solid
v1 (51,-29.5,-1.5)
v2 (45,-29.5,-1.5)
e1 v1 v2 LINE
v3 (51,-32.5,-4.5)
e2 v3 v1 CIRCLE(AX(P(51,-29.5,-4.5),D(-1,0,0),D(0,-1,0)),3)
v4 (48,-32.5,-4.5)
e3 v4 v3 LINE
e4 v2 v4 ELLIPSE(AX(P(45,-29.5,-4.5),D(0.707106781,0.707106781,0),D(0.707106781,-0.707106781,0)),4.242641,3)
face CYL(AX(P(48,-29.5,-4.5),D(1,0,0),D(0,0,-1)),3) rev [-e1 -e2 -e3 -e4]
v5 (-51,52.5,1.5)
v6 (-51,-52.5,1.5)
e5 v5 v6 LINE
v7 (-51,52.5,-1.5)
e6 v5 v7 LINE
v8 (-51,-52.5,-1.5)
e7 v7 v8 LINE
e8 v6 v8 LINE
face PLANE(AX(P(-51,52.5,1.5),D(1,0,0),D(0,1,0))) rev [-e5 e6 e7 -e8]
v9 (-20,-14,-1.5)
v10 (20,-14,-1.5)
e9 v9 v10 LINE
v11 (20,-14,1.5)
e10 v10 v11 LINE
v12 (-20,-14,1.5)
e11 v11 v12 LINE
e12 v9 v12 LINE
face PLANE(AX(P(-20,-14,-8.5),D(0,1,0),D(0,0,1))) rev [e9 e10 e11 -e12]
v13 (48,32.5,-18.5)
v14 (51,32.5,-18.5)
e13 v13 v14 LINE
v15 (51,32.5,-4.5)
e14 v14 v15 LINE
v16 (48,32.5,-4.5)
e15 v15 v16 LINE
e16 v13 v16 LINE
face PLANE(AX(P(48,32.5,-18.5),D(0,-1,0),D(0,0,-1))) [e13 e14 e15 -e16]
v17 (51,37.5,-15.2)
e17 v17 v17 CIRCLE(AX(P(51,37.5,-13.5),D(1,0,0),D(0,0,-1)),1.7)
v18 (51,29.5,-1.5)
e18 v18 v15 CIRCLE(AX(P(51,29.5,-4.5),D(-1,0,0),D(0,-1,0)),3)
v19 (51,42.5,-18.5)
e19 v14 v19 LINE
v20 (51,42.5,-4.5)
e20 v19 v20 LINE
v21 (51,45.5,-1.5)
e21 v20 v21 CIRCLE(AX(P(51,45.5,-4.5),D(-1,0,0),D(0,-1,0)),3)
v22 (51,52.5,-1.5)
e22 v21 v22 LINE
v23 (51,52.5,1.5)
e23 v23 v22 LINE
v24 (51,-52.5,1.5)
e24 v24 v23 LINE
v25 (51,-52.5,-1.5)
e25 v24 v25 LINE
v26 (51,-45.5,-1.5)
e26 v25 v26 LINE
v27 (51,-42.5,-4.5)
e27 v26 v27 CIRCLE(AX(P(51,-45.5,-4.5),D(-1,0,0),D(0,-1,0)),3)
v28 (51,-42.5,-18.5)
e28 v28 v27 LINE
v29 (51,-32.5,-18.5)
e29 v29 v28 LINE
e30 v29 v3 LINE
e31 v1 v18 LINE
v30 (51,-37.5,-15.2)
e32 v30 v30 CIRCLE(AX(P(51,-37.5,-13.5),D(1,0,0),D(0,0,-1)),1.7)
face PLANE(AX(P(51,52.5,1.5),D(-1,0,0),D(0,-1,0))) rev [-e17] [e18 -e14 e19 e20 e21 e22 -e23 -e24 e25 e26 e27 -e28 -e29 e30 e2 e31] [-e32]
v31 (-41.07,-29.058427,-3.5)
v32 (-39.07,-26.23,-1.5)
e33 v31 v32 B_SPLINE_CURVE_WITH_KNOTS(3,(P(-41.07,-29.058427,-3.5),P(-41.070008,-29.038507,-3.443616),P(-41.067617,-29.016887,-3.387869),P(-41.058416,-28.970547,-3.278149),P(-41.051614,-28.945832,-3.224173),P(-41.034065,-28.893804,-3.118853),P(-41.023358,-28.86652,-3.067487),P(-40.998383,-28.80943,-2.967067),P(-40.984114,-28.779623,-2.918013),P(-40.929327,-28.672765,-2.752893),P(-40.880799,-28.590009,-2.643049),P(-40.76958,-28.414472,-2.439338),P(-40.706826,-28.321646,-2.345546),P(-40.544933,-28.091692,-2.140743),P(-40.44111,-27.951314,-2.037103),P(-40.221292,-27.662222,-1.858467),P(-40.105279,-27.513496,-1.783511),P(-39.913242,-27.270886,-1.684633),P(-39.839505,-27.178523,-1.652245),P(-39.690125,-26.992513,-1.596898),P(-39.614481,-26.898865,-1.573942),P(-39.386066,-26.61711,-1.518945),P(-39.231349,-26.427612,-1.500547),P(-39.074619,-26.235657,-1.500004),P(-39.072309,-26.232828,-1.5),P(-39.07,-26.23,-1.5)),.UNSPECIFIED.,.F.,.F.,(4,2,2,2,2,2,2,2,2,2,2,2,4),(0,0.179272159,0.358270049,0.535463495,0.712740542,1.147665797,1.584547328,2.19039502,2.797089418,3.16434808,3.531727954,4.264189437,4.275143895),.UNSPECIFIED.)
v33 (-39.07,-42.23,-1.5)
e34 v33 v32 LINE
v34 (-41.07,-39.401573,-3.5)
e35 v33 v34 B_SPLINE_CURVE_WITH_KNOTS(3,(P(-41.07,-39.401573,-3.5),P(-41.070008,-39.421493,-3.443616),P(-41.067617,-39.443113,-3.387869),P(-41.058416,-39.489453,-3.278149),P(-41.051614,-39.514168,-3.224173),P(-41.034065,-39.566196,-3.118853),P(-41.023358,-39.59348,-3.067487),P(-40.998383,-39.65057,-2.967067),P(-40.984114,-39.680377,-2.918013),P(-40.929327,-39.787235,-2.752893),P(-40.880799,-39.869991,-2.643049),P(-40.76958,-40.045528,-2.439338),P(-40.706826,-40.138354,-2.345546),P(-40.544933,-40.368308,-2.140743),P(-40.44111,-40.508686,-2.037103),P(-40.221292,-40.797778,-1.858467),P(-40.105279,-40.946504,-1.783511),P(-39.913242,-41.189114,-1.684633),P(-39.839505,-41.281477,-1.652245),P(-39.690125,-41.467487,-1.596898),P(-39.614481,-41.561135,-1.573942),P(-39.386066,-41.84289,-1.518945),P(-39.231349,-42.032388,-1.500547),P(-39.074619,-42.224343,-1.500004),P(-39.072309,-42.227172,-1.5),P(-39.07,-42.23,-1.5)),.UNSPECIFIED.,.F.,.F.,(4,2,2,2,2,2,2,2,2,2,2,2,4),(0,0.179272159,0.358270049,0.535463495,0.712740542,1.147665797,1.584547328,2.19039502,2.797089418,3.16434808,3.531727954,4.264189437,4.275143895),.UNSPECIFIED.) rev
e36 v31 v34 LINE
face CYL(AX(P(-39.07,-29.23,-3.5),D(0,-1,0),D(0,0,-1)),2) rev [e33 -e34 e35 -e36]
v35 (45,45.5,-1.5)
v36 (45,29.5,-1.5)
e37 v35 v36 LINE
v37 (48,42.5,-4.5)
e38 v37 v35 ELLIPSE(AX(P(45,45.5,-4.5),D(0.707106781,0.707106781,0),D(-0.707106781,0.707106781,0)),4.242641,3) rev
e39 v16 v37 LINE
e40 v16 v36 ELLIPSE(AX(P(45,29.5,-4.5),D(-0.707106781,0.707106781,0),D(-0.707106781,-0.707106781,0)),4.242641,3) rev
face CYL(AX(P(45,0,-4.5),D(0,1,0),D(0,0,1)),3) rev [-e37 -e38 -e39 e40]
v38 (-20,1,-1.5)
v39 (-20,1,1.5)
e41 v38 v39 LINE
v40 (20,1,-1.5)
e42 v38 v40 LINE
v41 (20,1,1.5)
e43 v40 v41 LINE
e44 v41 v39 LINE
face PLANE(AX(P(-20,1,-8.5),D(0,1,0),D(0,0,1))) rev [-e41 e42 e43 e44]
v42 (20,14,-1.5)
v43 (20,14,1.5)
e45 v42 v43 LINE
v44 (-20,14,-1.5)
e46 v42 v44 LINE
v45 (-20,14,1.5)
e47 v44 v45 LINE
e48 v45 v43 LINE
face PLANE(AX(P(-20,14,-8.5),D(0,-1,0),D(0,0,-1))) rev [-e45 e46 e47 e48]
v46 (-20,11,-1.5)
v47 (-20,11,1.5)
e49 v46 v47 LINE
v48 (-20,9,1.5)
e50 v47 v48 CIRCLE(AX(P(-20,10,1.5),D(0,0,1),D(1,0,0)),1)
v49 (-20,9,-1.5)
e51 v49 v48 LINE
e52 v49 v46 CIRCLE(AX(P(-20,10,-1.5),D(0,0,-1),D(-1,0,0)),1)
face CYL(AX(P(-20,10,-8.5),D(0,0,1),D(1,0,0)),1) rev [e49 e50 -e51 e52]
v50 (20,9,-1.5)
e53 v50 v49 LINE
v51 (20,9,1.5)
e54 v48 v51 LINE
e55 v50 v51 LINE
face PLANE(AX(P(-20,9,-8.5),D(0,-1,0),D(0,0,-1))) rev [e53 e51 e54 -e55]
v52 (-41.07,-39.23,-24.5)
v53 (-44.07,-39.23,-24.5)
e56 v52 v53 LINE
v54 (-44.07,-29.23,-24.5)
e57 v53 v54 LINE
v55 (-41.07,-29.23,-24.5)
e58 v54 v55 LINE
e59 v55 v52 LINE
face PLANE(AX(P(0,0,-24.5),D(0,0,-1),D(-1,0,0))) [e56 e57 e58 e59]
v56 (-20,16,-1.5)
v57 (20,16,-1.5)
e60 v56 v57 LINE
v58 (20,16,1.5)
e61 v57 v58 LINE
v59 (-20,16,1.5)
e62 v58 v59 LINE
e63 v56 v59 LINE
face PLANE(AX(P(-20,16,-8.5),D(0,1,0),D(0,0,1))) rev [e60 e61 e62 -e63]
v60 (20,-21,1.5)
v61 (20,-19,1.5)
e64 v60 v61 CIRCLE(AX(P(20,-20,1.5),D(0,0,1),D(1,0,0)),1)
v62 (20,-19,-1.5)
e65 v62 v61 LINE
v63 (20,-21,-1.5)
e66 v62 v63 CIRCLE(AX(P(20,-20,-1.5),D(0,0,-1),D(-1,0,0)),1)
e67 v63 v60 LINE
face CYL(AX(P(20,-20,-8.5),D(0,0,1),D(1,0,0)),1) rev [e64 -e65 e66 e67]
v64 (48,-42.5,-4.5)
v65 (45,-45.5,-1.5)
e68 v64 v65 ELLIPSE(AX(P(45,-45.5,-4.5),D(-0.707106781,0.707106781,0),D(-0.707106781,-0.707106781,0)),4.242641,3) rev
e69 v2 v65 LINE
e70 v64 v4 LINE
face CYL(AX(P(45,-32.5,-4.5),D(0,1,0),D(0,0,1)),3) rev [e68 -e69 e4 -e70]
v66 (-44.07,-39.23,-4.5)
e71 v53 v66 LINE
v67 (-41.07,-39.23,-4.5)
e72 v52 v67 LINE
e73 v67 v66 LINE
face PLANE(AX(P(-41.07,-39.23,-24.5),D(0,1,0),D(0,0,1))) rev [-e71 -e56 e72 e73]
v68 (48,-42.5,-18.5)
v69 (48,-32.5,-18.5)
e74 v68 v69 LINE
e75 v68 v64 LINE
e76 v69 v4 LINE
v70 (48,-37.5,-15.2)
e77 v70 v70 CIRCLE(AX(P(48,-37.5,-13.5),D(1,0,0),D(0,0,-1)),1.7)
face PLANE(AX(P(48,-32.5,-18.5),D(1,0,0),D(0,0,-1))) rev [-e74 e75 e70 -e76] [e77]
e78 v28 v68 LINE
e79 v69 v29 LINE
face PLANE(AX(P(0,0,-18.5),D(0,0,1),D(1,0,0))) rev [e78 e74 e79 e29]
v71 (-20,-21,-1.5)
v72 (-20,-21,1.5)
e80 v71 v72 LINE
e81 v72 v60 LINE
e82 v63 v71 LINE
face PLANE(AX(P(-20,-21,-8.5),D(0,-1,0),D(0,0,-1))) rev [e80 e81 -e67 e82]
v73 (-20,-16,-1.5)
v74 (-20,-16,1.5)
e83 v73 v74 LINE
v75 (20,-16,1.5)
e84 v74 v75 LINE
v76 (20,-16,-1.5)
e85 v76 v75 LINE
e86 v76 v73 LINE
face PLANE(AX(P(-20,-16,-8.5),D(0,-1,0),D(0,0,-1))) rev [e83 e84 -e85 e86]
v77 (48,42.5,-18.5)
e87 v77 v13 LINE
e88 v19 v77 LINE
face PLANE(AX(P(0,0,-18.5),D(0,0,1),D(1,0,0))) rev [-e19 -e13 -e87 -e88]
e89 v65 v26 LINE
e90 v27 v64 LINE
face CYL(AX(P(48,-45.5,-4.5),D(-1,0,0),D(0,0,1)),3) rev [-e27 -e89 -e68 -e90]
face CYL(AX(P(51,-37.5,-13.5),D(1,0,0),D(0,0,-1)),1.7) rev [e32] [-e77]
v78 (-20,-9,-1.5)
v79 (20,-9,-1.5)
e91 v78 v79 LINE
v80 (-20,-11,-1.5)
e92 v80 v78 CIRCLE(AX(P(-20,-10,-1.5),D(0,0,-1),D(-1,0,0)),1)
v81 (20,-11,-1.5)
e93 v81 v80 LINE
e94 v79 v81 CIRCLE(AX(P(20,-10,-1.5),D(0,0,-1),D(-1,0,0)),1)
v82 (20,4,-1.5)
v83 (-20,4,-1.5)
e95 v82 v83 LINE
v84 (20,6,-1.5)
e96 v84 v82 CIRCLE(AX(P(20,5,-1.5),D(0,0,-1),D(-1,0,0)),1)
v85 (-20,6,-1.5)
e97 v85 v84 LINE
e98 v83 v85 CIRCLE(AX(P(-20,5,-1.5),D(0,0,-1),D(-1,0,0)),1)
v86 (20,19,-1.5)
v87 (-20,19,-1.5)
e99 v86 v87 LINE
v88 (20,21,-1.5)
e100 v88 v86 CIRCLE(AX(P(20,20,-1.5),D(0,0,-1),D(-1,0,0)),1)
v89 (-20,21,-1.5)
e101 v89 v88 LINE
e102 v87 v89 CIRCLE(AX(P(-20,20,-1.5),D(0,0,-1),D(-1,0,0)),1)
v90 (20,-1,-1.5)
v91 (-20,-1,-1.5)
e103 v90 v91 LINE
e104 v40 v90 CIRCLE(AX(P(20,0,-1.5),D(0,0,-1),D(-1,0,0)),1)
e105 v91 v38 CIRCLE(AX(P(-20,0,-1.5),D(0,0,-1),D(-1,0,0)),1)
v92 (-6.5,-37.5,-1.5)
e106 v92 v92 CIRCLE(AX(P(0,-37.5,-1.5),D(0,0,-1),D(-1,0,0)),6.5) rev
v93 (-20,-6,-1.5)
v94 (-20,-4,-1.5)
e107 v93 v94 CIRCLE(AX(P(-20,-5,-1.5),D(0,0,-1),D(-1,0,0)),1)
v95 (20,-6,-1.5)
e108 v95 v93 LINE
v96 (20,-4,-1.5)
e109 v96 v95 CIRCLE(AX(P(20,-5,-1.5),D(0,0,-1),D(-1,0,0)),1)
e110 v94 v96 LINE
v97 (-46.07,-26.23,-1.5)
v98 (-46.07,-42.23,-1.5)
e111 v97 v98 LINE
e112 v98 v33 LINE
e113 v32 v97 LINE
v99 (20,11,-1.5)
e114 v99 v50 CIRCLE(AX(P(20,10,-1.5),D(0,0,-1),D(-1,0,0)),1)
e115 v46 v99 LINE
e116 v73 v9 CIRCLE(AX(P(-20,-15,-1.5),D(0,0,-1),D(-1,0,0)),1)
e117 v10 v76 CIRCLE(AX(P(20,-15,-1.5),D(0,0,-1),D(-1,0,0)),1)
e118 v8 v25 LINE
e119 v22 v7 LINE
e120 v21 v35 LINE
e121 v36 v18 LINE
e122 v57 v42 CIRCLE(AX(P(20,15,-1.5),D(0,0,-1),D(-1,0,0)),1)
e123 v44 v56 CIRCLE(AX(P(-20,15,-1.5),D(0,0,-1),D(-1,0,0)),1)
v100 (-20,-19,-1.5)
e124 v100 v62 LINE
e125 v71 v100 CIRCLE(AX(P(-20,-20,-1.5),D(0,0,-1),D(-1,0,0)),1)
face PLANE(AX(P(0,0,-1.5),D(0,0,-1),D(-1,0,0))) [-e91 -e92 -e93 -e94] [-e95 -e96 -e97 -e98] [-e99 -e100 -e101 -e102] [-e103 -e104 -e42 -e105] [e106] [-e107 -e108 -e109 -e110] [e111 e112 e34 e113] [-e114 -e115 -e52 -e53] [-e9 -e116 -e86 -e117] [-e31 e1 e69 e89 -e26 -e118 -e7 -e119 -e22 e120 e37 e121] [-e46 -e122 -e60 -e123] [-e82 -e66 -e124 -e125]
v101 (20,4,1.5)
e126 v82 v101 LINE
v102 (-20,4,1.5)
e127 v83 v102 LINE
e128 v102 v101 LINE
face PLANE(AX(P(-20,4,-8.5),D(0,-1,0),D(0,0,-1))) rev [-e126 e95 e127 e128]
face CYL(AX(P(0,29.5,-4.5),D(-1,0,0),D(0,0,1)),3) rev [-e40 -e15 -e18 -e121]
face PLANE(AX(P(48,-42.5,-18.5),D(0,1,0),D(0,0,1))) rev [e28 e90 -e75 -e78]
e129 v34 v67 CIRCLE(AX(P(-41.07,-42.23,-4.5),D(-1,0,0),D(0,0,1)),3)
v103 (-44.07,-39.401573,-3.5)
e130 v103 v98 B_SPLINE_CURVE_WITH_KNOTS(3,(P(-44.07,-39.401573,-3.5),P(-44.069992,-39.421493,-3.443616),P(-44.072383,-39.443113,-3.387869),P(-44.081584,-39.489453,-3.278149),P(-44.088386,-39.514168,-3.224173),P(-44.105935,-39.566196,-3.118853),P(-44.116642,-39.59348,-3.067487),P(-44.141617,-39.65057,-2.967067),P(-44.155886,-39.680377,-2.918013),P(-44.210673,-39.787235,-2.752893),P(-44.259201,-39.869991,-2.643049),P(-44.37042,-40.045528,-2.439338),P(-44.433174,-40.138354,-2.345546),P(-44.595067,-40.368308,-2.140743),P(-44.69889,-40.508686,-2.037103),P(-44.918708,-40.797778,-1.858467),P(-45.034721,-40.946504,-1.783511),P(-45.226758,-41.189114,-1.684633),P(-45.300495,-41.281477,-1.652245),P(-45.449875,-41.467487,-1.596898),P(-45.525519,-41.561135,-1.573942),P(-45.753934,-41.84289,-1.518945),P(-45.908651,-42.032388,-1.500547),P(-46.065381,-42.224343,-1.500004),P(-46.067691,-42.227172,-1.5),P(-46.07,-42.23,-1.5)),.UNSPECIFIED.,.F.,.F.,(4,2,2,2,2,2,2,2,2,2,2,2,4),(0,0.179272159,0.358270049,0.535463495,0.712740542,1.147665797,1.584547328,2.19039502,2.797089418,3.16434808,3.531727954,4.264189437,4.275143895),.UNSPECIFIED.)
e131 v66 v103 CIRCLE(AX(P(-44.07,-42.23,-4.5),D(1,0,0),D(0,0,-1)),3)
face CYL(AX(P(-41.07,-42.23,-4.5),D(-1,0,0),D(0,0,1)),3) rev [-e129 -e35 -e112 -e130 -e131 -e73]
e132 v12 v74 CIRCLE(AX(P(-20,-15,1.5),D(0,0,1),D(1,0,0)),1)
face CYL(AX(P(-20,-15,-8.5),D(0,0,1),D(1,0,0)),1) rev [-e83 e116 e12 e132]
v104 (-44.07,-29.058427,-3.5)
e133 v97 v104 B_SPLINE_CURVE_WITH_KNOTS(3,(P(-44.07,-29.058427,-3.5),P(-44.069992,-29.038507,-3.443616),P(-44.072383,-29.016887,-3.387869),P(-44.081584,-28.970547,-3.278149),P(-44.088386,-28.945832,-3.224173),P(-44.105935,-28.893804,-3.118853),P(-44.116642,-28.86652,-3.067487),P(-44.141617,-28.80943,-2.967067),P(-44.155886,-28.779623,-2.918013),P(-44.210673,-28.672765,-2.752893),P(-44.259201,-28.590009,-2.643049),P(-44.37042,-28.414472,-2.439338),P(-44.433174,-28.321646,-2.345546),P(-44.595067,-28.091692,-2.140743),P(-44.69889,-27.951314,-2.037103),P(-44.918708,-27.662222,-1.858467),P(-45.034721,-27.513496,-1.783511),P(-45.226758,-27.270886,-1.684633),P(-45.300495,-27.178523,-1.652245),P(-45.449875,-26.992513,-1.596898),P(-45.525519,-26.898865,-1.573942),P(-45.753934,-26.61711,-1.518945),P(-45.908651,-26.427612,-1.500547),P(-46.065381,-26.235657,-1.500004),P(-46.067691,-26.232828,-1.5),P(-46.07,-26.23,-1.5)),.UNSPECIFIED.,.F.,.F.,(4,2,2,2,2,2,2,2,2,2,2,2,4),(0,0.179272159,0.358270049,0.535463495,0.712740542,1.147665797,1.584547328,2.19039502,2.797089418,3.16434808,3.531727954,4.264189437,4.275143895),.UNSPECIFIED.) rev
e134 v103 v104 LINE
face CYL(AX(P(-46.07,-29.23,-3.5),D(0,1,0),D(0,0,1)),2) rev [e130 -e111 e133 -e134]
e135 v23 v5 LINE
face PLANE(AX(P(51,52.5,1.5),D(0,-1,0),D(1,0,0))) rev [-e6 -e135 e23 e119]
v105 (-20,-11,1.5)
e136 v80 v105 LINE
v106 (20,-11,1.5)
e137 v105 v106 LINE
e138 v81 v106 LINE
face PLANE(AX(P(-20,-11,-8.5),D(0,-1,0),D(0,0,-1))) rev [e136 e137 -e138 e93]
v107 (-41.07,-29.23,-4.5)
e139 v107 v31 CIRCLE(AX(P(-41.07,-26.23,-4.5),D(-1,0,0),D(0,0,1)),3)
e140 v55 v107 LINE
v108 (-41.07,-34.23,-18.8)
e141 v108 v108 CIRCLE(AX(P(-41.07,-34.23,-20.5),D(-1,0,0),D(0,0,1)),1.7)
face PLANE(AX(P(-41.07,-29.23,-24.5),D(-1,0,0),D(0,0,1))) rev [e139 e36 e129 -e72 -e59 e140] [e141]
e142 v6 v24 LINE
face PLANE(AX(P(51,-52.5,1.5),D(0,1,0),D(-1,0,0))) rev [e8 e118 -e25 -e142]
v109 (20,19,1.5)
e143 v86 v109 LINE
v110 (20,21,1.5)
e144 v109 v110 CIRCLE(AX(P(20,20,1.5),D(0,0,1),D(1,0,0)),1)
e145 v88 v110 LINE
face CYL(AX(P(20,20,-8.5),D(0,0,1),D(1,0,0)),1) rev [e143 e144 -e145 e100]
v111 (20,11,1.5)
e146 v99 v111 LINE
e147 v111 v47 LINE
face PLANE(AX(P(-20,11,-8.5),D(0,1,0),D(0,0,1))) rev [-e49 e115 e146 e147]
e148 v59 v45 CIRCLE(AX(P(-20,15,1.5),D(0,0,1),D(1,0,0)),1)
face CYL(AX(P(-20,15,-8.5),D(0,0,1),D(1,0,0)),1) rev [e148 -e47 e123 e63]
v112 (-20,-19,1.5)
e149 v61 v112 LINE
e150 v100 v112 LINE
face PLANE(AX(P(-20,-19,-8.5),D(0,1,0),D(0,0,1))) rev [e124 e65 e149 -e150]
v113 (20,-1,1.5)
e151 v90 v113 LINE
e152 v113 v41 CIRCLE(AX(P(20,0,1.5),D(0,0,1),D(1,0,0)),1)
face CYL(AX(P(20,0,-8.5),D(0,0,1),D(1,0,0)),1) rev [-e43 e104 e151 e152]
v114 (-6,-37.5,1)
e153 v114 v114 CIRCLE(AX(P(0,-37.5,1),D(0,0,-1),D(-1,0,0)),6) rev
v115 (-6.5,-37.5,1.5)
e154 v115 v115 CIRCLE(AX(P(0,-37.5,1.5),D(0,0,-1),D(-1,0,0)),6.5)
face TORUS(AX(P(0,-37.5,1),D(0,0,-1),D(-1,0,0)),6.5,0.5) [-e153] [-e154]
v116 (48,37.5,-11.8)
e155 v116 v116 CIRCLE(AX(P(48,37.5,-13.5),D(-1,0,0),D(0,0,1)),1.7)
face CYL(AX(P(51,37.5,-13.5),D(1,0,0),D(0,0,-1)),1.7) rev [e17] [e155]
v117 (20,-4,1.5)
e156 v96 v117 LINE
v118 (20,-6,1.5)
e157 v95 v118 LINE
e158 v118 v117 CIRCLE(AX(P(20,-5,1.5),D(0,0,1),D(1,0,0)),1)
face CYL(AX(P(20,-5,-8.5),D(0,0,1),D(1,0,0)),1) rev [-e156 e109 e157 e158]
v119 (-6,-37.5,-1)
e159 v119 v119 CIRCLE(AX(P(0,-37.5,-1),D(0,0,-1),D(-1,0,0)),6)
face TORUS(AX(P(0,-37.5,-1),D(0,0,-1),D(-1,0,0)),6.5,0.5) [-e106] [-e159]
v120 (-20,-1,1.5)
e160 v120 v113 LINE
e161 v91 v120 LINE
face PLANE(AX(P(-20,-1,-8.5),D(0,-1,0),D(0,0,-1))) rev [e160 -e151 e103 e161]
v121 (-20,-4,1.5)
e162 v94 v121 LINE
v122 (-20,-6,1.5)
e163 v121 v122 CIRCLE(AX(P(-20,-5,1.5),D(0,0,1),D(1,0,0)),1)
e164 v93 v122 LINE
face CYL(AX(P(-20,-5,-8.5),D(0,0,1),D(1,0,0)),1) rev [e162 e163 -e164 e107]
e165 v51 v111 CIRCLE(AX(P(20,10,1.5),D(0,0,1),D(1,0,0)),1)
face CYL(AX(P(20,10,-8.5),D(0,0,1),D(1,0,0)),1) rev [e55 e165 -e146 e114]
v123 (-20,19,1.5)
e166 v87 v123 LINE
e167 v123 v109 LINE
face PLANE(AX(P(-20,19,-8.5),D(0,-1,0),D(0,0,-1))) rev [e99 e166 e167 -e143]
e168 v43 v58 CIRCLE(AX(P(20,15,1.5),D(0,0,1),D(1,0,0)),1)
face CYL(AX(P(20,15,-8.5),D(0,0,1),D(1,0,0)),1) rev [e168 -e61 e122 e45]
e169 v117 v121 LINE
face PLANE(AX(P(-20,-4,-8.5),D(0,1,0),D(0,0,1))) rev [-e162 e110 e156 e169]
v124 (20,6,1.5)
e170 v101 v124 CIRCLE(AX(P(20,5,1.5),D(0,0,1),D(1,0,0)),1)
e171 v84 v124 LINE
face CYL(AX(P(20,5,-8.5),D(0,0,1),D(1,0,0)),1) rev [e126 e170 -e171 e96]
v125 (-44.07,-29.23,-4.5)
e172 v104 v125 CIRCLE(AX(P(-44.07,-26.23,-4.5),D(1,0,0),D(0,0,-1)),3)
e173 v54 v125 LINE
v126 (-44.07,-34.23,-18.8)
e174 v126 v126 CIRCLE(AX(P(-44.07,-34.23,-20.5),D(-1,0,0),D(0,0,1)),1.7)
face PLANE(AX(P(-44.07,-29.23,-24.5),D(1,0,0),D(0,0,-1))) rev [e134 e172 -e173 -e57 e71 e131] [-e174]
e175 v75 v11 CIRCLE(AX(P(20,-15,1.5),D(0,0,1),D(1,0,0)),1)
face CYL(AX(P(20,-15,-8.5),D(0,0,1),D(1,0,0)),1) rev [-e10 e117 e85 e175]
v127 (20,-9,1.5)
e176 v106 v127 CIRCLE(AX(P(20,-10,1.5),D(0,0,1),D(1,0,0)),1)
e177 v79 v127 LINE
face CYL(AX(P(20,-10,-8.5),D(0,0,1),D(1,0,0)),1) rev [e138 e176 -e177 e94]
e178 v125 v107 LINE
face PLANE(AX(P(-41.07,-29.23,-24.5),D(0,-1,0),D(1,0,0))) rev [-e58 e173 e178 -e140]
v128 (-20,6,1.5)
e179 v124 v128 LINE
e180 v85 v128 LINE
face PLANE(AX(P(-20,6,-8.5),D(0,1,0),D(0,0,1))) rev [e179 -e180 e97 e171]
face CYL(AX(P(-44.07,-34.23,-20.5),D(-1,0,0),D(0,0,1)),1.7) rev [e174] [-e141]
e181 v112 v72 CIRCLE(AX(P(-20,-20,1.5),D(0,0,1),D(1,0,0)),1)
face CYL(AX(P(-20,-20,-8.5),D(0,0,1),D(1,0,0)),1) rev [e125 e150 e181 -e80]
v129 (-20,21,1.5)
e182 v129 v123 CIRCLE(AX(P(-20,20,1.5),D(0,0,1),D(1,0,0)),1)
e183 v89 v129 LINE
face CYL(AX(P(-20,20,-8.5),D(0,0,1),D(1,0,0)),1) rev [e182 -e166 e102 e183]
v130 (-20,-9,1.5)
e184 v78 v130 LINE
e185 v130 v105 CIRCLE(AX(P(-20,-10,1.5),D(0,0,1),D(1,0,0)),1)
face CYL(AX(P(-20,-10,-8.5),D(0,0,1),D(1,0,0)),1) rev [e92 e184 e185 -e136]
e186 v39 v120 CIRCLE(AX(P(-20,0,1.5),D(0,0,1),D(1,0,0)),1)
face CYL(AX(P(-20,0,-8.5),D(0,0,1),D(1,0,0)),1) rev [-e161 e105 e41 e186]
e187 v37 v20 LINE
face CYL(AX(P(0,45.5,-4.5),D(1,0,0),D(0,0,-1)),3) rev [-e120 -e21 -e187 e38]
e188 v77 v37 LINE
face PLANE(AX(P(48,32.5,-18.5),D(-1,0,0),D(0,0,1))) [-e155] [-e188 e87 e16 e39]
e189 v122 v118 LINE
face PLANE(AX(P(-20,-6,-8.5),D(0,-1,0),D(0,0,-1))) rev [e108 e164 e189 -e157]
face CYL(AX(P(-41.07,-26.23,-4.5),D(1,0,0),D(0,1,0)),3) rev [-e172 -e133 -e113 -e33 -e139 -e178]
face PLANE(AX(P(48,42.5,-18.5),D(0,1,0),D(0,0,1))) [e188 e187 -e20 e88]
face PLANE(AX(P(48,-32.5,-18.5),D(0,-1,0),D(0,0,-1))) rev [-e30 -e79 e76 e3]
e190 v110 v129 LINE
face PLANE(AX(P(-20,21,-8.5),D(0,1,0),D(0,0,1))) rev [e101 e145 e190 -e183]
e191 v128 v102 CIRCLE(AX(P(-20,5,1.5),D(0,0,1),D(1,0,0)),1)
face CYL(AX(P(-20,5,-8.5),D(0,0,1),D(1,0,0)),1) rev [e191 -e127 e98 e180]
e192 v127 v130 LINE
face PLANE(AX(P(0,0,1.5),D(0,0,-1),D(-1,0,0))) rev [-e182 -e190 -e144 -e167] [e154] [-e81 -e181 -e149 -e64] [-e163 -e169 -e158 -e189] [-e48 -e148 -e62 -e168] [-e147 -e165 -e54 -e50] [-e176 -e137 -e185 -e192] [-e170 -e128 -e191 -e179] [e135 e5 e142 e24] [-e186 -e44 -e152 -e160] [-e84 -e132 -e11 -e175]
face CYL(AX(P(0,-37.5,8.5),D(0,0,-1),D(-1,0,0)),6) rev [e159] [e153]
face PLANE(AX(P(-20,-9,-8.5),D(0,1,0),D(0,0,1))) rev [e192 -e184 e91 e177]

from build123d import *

# Parameters (mm, degrees)
SKETCH1_W                = 102
SKETCH1_H                = 105
BOSS_EXTRUDE1_DEPTH      = 1.5
SKETCH2_W                = 3
SKETCH2_H                = 10
BOSS_EXTRUDE2_DEPTH      = 23
FILLET1_R                = 2
M3_CLEARANCE_HOLE1_D     = 3.4
SKETCH6_W                = 3
SKETCH6_H                = 10
BOSS_EXTRUDE3_DEPTH      = 17
M3_CLEARANCE_HOLE2_D     = 3.4
M3_CLEARANCE_HOLE2_DEPTH = 3
CUT_EXTRUDE1_DEPTH       = 10
SKETCH10_R               = 6
CUT_EXTRUDE2_DEPTH       = 10
FILLET2_R                = 3
FILLET3_R                = 0.5


with BuildPart() as part:
    # Sketch1 → Boss-Extrude1 (new, symmetric)
    with BuildSketch(Plane.XY):
        Rectangle(SKETCH1_W, SKETCH1_H)
    extrude(amount=BOSS_EXTRUDE1_DEPTH, both=True)

    # Sketch2 → Boss-Extrude2 (add)
    with BuildSketch(Plane(origin=(0, 0, -1.5), x_dir=(-1, 0, 0), z_dir=(0, 0, -1))):
        with Locations((42.57, -34.23)):
            Rectangle(SKETCH2_W, SKETCH2_H)
    extrude(amount=BOSS_EXTRUDE2_DEPTH)

    # Fillet1
    fillet1_edges = [part.edges().sort_by_distance(p)[0] for p in [
        (-44.07, -34.23, -1.5),
        (-41.07, -34.23, -1.5),
    ]]
    fillet(fillet1_edges, radius=FILLET1_R)

    # M3 Clearance Hole1 (through all)
    with Locations(Plane.ZY.offset(44.07)):
        with Locations((-20.5, -34.23)):
            Hole(M3_CLEARANCE_HOLE1_D / 2)

    # Sketch6 → Boss-Extrude3 (add)
    with BuildSketch(Plane(origin=(0, 0, -1.5), x_dir=(-1, 0, 0), z_dir=(0, 0, -1))):
        with Locations((-49.5, -37.5)):
            Rectangle(SKETCH6_W, SKETCH6_H)
    boss_extrude3 = extrude(amount=BOSS_EXTRUDE3_DEPTH)

    # M3 Clearance Hole2
    with Locations(Plane(origin=(51, 0, 0), x_dir=(0, 0, -1), z_dir=(1, 0, 0))):
        with Locations((13.5, -37.5)):
            m3_clearance_hole2 = Hole(M3_CLEARANCE_HOLE2_D / 2, depth=M3_CLEARANCE_HOLE2_DEPTH)

    # Sketch9 → Cut-Extrude1 (cut)
    with BuildSketch(Plane.XY.offset(1.5)):
        with BuildLine():
            Line((-20, 6), (20, 6))
            ThreePointArc((20, 6), (21, 5), (20, 4))
            Line((20, 4), (-20, 4))
            ThreePointArc((-20, 4), (-21, 5), (-20, 6))
        make_face()
        with BuildLine():
            Line((-20, 1), (20, 1))
            ThreePointArc((20, 1), (21, 0), (20, -1))
            Line((20, -1), (-20, -1))
            ThreePointArc((-20, -1), (-21, 0), (-20, 1))
        make_face()
        with BuildLine():
            Line((-20, -4), (20, -4))
            ThreePointArc((20, -4), (21, -5), (20, -6))
            Line((20, -6), (-20, -6))
            ThreePointArc((-20, -6), (-21, -5), (-20, -4))
        make_face()
        with BuildLine():
            Line((-20, 11), (20, 11))
            ThreePointArc((20, 11), (21, 10), (20, 9))
            Line((20, 9), (-20, 9))
            ThreePointArc((-20, 9), (-21, 10), (-20, 11))
        make_face()
        with BuildLine():
            Line((-20, -9), (20, -9))
            ThreePointArc((20, -9), (21, -10), (20, -11))
            Line((20, -11), (-20, -11))
            ThreePointArc((-20, -11), (-21, -10), (-20, -9))
        make_face()
        with BuildLine():
            Line((-20, 16), (20, 16))
            ThreePointArc((20, 16), (21, 15), (20, 14))
            Line((20, 14), (-20, 14))
            ThreePointArc((-20, 14), (-21, 15), (-20, 16))
        make_face()
        with BuildLine():
            Line((-20, 21), (20, 21))
            ThreePointArc((20, 21), (21, 20), (20, 19))
            Line((20, 19), (-20, 19))
            ThreePointArc((-20, 19), (-21, 20), (-20, 21))
        make_face()
        with BuildLine():
            Line((-20, -14), (20, -14))
            ThreePointArc((20, -14), (21, -15), (20, -16))
            Line((20, -16), (-20, -16))
            ThreePointArc((-20, -16), (-21, -15), (-20, -14))
        make_face()
        with BuildLine():
            Line((-20, -19), (20, -19))
            ThreePointArc((20, -19), (21, -20), (20, -21))
            Line((20, -21), (-20, -21))
            ThreePointArc((-20, -21), (-21, -20), (-20, -19))
        make_face()
    extrude(amount=-CUT_EXTRUDE1_DEPTH, mode=Mode.SUBTRACT)

    # Sketch10 → Cut-Extrude2 (cut)
    with BuildSketch(Plane(origin=(0, 0, -1.5), x_dir=(-1, 0, 0), z_dir=(0, 0, -1))):
        with Locations((0, -37.5)):
            Circle(SKETCH10_R)
    extrude(amount=-CUT_EXTRUDE2_DEPTH, mode=Mode.SUBTRACT)

    # Mirror1: Boss-Extrude3, M3 Clearance Hole2 across plane
    add(boss_extrude3.mirror(Plane.ZX))
    add(m3_clearance_hole2.mirror(Plane.ZX), mode=Mode.SUBTRACT)

    # Fillet2
    fillet2_edges = [part.edges().sort_by_distance(p)[0] for p in [
        (49.5, -32.5, -1.5),
    ]]
    fillet(fillet2_edges, radius=FILLET2_R)
    fillet2_2_edges = [part.edges().sort_by_distance(p)[0] for p in [
        (48, -37.5, -1.5),
    ]]
    fillet(fillet2_2_edges, radius=FILLET2_R)
    fillet2_3_edges = [part.edges().sort_by_distance(p)[0] for p in [
        (49.5, -42.5, -1.5),
    ]]
    fillet(fillet2_3_edges, radius=FILLET2_R)
    fillet2_4_edges = [part.edges().sort_by_distance(p)[0] for p in [
        (49.5, 42.5, -1.5),
    ]]
    fillet(fillet2_4_edges, radius=FILLET2_R)
    fillet2_5_edges = [part.edges().sort_by_distance(p)[0] for p in [
        (48, 37.5, -1.5),
    ]]
    fillet(fillet2_5_edges, radius=FILLET2_R - 0.0001)  # a hair under: the kernel refuses the full size
    fillet2_6_edges = [part.edges().sort_by_distance(p)[0] for p in [
        (49.5, 32.5, -1.5),
    ]]
    fillet(fillet2_6_edges, radius=FILLET2_R - 0.0001)  # a hair under: the kernel refuses the full size
    fillet2_7_edges = [part.edges().sort_by_distance(p)[0] for p in [
        (-42.57, -29.23, -1.5),
    ]]
    fillet(fillet2_7_edges, radius=FILLET2_R)
    fillet2_8_edges = [part.edges().sort_by_distance(p)[0] for p in [
        (-42.57, -39.23, -1.5),
    ]]
    fillet(fillet2_8_edges, radius=FILLET2_R)

    # Fillet3
    fillet3_edges = [part.edges().sort_by_distance(p)[0] for p in [
        (6, -37.5, 1.5),
        (6, -37.5, -1.5),
    ]]
    fillet(fillet3_edges, radius=FILLET3_R)


solid = part.part
